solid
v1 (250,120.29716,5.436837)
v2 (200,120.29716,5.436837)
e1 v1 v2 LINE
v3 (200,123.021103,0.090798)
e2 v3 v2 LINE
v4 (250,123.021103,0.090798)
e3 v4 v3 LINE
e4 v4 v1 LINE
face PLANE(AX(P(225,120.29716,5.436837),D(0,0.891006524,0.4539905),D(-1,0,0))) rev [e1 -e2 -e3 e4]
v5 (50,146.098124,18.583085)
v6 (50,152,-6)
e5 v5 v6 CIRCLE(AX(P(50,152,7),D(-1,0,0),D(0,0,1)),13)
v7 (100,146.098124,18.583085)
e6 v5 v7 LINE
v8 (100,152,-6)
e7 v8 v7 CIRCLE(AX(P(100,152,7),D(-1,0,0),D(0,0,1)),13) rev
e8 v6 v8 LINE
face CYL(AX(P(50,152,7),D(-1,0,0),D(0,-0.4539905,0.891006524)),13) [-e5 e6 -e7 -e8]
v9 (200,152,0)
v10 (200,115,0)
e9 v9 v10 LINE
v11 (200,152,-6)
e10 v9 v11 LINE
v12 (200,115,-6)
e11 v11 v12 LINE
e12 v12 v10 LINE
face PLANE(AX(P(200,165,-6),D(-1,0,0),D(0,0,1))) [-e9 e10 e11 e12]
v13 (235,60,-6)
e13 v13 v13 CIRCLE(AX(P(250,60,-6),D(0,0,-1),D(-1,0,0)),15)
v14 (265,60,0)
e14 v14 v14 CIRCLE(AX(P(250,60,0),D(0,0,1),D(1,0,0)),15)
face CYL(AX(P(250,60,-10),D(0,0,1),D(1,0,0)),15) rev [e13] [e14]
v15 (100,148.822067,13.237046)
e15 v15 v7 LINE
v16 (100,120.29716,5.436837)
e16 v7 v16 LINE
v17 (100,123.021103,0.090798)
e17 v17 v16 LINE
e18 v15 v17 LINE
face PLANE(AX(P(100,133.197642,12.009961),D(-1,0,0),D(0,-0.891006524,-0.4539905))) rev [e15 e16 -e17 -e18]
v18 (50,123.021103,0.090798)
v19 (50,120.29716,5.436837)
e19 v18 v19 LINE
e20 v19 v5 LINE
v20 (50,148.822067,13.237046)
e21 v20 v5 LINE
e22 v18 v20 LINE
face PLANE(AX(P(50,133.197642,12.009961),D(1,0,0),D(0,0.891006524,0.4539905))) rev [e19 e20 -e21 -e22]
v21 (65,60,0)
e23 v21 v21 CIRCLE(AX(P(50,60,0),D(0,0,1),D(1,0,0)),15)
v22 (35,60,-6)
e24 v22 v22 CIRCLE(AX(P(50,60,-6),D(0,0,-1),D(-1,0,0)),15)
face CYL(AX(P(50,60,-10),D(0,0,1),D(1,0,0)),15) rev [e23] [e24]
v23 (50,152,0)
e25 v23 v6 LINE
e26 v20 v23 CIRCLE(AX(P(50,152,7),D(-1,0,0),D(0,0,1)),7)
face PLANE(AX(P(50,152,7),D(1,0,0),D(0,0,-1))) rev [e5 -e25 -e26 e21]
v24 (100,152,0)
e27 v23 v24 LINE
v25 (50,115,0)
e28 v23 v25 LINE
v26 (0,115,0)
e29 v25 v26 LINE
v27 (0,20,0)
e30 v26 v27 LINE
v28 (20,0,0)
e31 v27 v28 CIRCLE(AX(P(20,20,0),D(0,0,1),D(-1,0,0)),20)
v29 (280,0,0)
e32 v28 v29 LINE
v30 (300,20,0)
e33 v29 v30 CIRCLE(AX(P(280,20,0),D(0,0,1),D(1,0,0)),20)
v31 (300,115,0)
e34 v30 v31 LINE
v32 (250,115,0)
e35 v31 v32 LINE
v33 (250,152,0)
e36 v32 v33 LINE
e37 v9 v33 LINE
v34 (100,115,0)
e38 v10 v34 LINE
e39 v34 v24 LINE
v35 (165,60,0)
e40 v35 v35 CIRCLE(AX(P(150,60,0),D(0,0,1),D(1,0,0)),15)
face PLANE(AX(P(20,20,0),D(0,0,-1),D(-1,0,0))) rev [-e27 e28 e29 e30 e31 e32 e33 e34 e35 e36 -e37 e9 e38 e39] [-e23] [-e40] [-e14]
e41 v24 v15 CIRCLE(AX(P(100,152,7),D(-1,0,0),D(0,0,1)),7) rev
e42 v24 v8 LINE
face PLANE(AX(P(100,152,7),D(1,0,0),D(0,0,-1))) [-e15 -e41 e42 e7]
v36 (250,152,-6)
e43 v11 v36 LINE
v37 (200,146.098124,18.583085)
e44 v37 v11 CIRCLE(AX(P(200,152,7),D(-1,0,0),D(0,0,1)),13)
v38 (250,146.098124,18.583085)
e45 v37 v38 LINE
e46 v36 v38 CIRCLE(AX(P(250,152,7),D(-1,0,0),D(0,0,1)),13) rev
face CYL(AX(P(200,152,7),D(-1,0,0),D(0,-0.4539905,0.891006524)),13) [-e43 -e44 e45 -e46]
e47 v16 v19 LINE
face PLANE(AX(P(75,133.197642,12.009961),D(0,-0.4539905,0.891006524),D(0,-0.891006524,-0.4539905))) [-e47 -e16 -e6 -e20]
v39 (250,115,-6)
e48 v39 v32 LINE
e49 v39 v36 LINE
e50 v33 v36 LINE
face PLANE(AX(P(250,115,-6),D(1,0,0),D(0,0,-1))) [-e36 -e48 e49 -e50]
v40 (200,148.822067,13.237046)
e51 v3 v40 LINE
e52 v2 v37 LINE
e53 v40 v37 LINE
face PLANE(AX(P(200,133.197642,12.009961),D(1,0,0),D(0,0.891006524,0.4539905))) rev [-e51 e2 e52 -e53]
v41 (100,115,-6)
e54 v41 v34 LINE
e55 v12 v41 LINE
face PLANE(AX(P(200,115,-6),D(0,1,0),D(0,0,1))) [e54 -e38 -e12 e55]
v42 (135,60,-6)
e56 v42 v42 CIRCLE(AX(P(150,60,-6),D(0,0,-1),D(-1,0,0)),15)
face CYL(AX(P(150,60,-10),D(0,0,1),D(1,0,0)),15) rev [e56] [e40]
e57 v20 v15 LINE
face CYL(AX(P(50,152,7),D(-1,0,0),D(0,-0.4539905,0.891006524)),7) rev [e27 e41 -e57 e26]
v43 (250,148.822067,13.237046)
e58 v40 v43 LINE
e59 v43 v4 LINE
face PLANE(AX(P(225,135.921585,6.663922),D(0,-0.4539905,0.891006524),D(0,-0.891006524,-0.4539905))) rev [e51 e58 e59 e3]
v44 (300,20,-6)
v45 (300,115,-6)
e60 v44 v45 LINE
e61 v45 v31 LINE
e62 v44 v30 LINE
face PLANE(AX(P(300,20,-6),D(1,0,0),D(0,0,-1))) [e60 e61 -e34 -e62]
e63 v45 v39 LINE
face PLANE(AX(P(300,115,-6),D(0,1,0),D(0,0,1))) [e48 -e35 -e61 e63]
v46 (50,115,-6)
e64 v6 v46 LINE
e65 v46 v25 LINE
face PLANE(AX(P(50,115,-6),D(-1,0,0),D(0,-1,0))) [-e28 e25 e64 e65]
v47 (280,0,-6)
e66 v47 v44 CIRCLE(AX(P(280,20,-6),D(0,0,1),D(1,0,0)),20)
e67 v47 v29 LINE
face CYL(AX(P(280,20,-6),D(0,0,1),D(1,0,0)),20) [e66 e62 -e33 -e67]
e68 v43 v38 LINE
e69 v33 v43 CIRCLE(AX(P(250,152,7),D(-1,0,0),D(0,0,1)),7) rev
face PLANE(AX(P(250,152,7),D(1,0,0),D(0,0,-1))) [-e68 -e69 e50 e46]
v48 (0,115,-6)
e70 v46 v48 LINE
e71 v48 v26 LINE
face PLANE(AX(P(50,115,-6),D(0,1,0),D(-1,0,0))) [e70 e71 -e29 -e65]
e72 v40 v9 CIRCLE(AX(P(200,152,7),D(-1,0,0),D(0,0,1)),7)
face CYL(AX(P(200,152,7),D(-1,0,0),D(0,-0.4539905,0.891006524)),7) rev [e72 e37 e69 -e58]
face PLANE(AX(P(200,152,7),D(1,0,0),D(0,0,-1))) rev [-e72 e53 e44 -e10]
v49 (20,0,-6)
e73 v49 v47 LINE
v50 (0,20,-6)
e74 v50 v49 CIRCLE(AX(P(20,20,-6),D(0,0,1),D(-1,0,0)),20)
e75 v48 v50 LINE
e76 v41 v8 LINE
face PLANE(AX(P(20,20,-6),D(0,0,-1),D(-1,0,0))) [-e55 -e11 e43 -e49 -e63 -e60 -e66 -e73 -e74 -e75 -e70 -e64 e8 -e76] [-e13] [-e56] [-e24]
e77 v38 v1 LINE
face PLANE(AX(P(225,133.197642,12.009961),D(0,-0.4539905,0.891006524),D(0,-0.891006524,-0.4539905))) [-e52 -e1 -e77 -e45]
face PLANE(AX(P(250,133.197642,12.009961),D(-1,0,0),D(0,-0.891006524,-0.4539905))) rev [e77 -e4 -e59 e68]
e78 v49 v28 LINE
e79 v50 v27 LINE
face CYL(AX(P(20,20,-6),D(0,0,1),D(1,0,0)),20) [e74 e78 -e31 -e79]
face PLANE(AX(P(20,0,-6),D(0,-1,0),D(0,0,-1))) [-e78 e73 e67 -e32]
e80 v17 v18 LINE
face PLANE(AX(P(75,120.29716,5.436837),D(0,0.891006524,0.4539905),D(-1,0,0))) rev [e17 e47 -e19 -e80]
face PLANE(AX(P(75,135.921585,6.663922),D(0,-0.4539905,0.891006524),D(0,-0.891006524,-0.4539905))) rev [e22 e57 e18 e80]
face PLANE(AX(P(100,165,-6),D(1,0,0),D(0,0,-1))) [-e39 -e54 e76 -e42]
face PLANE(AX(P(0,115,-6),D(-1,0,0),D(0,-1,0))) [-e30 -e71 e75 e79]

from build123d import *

# Parameters (mm, degrees)
BASE_FLANGE1_DEPTH = 6
HEM1_START         = 50
HEM1_DEPTH         = 200
HEM1_2_DEPTH       = 50
HEM1_START_2       = 200
HEM1_3_DEPTH       = 50
SKETCH11_R         = 15
CUT_EXTRUDE1_DEPTH = 10


# Read off the part's stored shape, not the designer's step: Hem1
# Sheet-metal steps are written as plain solids
with BuildPart() as part:
    # Sketch2 → Base-Flange1 (new body)
    with BuildSketch(Plane.XY):
        with BuildLine():
            Line((20, 0), (280, 0))
            ThreePointArc((280, 0), (294.142135624, 5.857864376), (300, 20))
            Line((300, 20), (300, 115))
            Line((300, 115), (250, 115))
            Line((250, 115), (250, 165))
            Line((250, 165), (200, 165))
            Line((200, 165), (200, 115))
            Line((200, 115), (100, 115))
            Line((100, 115), (100, 165))
            Line((100, 165), (50, 165))
            Line((50, 165), (50, 115))
            Line((50, 115), (0, 115))
            Line((0, 115), (0, 20))
            ThreePointArc((0, 20), (5.857864376, 5.857864376), (20, 0))
        make_face()
    extrude(amount=-BASE_FLANGE1_DEPTH)

    # Hem1 outline → Hem1 (cut)
    with BuildSketch(Plane.YZ.offset(HEM1_START)):
        with BuildLine():
            Line((165, 0), (162.95445115, 0))
            ThreePointArc((162.95445115, 0), (158.244997998, -4.401754251), (152, -6))
            Line((152, -6), (165, -6))
            Line((165, -6), (165, 0))
        make_face()
    extrude(amount=HEM1_DEPTH, mode=Mode.SUBTRACT)

    # Hem1 2 outline → Hem1 2 (add)
    with BuildSketch(Plane.YZ.offset(HEM1_START)):
        with BuildLine():
            Line((120.297159916, 5.436837245), (123.021102914, 0.0907981))
            Line((123.021102914, 0.0907981), (148.822066502, 13.237045669))
            ThreePointArc((148.822066502, 13.237045669), (158.806589443, 8.634117547), (152, 0))
            Line((152, 0), (162.95445115, 0))
            ThreePointArc((162.95445115, 0), (161.628857043, 15.734134876), (146.098123503, 18.583084814))
            Line((146.098123503, 18.583084814), (120.297159916, 5.436837245))
        make_face()
    extrude(amount=HEM1_2_DEPTH)

    # Hem1 3 outline → Hem1 3 (add)
    with BuildSketch(Plane.YZ.offset(HEM1_START_2)):
        with BuildLine():
            Line((120.297159916, 5.436837245), (123.021102914, 0.0907981))
            Line((123.021102914, 0.0907981), (148.822066502, 13.237045669))
            ThreePointArc((148.822066502, 13.237045669), (158.806589443, 8.634117547), (152, 0))
            Line((152, 0), (162.95445115, 0))
            ThreePointArc((162.95445115, 0), (161.628857043, 15.734134876), (146.098123503, 18.583084814))
            Line((146.098123503, 18.583084814), (120.297159916, 5.436837245))
        make_face()
    extrude(amount=HEM1_3_DEPTH)

    # Sketch11 → Cut-Extrude1 (cut)
    with BuildSketch(Plane.XY):
        with Locations((250, 60)):
            Circle(SKETCH11_R)
        with Locations((150, 60)):
            Circle(SKETCH11_R)
        with Locations((50, 60)):
            Circle(SKETCH11_R)
    extrude(amount=-CUT_EXTRUDE1_DEPTH, mode=Mode.SUBTRACT)


solid = part.part
